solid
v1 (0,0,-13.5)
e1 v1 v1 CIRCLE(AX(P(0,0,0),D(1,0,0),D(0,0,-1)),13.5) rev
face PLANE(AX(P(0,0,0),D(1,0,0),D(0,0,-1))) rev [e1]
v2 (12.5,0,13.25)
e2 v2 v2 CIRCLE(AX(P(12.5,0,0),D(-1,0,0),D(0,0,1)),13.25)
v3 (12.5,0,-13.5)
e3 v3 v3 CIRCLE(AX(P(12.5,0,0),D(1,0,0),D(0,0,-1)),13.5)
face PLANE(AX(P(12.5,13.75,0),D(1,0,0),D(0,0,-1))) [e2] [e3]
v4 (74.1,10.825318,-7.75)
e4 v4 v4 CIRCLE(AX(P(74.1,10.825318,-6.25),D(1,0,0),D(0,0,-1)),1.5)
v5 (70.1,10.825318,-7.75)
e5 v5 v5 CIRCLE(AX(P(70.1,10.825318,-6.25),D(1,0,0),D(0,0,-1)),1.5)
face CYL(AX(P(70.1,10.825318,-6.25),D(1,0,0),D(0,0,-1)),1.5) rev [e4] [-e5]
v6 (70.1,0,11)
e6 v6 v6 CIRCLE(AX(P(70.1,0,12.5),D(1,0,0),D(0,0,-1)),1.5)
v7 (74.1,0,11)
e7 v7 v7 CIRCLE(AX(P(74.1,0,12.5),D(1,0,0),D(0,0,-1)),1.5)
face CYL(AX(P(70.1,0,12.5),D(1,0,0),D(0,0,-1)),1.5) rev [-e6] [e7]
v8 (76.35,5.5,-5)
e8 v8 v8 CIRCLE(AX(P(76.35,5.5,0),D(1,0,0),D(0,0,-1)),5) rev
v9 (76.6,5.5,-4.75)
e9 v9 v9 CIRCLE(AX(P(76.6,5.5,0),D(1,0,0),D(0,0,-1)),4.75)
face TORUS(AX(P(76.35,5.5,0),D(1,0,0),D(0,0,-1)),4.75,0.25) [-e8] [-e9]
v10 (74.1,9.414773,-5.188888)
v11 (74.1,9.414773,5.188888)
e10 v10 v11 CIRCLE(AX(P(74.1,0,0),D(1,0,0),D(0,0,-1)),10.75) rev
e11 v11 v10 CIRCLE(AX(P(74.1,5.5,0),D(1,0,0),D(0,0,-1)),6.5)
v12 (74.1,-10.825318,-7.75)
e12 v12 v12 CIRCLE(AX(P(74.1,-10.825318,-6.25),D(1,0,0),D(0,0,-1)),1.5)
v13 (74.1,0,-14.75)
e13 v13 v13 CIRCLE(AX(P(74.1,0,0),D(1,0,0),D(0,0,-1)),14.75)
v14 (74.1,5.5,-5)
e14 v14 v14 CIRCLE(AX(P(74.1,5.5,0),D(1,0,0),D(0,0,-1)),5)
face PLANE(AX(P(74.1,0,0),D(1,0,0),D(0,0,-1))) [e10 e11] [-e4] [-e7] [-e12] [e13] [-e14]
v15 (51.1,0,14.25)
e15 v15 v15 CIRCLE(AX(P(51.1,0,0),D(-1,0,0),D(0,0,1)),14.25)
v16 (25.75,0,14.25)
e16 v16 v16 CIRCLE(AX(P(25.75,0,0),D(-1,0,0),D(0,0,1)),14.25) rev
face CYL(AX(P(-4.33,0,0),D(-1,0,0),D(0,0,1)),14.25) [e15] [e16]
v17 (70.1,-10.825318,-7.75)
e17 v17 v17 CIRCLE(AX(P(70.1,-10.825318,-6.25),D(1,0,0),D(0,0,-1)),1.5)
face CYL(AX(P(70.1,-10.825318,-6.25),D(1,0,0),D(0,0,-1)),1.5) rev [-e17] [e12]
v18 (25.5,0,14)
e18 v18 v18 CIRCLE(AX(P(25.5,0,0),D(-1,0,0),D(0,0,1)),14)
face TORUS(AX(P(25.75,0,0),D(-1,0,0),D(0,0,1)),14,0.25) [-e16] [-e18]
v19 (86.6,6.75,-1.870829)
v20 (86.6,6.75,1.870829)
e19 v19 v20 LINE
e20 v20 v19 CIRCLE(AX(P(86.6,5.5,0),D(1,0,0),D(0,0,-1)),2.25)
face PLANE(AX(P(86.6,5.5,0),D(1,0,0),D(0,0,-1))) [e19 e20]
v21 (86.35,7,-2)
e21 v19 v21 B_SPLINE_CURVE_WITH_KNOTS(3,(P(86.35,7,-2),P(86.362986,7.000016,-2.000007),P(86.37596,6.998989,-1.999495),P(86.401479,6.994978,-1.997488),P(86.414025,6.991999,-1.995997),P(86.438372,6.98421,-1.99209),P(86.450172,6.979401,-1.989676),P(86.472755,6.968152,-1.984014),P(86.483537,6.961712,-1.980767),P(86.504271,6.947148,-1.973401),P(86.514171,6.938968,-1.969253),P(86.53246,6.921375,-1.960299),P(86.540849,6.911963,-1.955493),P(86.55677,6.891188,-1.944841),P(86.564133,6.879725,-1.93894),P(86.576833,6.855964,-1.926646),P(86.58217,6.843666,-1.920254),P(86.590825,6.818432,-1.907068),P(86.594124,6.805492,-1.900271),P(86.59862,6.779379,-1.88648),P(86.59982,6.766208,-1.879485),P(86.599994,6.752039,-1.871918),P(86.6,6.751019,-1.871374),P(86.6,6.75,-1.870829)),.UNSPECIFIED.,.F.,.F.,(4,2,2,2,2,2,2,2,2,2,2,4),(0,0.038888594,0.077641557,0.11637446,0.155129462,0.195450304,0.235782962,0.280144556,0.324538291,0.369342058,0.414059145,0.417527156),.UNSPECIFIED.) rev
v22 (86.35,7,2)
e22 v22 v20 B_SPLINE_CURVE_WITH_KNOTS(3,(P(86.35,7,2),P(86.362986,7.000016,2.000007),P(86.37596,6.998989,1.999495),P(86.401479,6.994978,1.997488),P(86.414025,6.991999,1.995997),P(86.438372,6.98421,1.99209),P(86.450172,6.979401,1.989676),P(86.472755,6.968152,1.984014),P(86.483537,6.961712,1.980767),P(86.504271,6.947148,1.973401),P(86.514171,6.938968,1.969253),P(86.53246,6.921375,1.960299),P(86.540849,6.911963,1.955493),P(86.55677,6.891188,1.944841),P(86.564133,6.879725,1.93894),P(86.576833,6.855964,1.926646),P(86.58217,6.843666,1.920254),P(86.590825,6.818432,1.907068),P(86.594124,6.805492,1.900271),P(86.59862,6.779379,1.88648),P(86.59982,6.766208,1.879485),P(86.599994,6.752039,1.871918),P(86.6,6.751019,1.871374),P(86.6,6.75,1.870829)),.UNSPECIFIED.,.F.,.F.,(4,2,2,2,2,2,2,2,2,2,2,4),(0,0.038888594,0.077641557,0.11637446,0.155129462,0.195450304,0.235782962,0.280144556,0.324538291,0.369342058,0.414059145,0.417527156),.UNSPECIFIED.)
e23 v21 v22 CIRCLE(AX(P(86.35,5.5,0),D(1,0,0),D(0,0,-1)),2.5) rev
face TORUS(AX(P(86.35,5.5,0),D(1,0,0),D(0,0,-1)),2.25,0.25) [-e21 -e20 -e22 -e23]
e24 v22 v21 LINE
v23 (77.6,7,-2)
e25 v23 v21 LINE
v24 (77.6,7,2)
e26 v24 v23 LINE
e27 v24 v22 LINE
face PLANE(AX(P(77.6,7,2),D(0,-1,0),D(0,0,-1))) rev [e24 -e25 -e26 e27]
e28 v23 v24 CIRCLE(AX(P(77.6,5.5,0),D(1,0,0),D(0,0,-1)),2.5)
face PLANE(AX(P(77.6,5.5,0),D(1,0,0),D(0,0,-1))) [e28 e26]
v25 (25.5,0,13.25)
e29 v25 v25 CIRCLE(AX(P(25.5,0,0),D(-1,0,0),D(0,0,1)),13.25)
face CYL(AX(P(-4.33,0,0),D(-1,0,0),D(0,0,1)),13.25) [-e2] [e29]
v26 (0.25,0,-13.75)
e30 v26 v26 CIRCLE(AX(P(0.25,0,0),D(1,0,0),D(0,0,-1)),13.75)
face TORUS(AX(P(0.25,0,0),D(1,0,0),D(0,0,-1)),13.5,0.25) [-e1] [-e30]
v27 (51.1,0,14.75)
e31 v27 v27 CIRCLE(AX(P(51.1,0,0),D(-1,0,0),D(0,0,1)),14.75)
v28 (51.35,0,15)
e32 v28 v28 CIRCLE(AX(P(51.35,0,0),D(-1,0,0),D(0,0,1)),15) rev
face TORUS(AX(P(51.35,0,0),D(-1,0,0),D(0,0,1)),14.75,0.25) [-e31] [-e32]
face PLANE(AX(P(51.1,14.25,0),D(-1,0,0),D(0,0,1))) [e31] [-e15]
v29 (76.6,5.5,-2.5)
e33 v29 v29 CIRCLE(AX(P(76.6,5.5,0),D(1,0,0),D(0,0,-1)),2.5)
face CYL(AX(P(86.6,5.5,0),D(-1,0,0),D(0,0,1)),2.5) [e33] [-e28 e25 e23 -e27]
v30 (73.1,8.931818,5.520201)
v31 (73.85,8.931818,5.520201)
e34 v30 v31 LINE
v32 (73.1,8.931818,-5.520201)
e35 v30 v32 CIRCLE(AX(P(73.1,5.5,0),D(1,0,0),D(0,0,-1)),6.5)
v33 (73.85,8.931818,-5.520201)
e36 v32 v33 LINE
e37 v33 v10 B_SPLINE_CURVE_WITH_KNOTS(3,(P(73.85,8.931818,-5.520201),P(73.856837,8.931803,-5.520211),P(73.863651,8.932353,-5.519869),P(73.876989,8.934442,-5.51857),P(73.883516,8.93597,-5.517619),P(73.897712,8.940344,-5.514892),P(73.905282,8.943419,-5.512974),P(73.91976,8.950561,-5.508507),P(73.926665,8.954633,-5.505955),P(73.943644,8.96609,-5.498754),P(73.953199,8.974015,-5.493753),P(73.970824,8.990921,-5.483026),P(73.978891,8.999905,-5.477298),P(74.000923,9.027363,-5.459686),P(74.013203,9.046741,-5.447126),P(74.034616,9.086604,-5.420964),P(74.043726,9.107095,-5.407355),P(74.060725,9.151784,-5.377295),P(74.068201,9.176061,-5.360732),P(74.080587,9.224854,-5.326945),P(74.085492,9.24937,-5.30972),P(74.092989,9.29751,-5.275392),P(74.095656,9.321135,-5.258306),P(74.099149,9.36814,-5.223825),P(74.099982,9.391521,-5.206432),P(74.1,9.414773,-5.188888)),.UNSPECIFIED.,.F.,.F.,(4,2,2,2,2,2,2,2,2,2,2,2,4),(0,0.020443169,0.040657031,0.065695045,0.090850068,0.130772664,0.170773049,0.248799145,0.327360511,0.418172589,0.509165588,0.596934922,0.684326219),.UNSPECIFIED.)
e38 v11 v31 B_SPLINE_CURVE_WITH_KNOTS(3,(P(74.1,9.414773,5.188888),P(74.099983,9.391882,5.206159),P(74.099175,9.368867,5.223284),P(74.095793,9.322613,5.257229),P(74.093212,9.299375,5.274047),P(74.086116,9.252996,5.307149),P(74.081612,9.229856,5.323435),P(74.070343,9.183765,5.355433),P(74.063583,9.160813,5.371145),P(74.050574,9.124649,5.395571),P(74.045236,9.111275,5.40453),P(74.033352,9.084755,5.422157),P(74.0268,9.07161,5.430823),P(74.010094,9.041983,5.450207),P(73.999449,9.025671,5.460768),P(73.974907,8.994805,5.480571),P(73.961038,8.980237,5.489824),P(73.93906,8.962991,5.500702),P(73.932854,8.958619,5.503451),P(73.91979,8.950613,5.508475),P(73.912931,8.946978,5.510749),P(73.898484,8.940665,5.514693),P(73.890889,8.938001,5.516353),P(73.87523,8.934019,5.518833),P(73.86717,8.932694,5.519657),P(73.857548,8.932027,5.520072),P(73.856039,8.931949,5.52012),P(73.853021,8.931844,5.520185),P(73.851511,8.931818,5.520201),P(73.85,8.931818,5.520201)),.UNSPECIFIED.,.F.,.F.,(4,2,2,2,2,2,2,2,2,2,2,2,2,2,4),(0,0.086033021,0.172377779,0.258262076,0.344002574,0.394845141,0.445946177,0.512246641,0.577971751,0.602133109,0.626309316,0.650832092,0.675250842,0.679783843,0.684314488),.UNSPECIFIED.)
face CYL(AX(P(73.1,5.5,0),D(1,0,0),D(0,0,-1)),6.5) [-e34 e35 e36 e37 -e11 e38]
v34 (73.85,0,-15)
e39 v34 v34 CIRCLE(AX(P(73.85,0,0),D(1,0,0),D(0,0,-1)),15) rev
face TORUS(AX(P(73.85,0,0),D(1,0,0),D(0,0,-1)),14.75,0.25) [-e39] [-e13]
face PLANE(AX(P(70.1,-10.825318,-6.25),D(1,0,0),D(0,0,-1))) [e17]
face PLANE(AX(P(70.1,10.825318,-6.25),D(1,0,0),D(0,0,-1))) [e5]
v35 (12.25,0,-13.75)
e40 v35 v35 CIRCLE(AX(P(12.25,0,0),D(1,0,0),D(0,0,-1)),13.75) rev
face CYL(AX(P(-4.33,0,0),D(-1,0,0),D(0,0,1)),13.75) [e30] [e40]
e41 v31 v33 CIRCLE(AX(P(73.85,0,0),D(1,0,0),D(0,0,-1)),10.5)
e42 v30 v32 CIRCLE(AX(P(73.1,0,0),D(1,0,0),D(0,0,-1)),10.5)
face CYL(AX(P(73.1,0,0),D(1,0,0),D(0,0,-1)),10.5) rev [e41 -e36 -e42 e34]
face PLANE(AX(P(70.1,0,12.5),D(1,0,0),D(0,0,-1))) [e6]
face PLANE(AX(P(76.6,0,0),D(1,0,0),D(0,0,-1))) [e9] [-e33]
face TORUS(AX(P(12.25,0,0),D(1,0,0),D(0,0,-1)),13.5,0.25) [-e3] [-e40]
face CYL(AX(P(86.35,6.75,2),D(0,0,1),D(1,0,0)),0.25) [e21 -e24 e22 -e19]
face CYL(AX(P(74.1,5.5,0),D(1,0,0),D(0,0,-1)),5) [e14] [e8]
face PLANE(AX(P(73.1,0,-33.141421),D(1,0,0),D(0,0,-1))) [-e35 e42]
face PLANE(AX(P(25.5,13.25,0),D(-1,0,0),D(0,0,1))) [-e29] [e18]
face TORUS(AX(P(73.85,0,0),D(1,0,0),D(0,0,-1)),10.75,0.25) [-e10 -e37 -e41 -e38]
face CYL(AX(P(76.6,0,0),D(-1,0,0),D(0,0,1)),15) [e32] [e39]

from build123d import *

# Parameters (mm, degrees)
SKETCH1_R           = 15
BOSS_EXTRUDE1_DEPTH = 76.6
SKETCH2_R           = 2.5
BOSS_EXTRUDE2_DEPTH = 10
CUT_EXTRUDE1_START  = -9
CUT_EXTRUDE1_DEPTH  = 9
CUT_EXTRUDE2_START  = -2.5
SKETCH6_R           = 15
SKETCH6_R_2         = 5
CUT_EXTRUDE2_DEPTH  = 2.5
CUT_EXTRUDE3_DEPTH  = 1
SKETCH8_R           = 1.5
CUT_EXTRUDE4_DEPTH  = 4
FILLET1_R           = 0.25


with BuildPart() as part:
    # Sketch1 → Boss-Extrude1 (new body)
    with BuildSketch(Plane(origin=(0, 0, 0), x_dir=(0, 0, -1), z_dir=(1, 0, 0))):
        Circle(SKETCH1_R)
    extrude(amount=BOSS_EXTRUDE1_DEPTH)

    # Sketch2 → Boss-Extrude2 (add)
    with BuildSketch(Plane(origin=(76.6, 0, 0), x_dir=(0, 0, -1), z_dir=(1, 0, 0))):
        with Locations((0, 5.5)):
            Circle(SKETCH2_R)
    extrude(amount=BOSS_EXTRUDE2_DEPTH)

    # Sketch4 → Cut-Extrude1 (cut)
    with BuildSketch(Plane(origin=(86.6, 0, 0), x_dir=(0, 0, -1), z_dir=(1, 0, 0)).offset(CUT_EXTRUDE1_START)):
        with BuildLine():
            Line((-2, 7), (2, 7))
            ThreePointArc((2, 7), (0, 8), (-2, 7))
        make_face()
    extrude(amount=CUT_EXTRUDE1_DEPTH, mode=Mode.SUBTRACT)

    # Sketch5 → Cut-Revolve1 (revolve, cut)
    with BuildSketch(Plane.XY, mode=Mode.PRIVATE) as cut_revolve1_sk:
        Polygon((0, 13.75), (12.5, 13.75), (12.5, 13.25), (25.5, 13.25), (25.5, 14.25), (51.1, 14.25), (51.1, 15), (0, 15), align=None)
    revolve(cut_revolve1_sk.sketch.rotate(Axis((-4.33, 0, 0), (1, 0, 0)), 90), axis=Axis((-4.33, 0, 0), (1, 0, 0)), mode=Mode.SUBTRACT)

    # Sketch6 → Cut-Extrude2 (cut)
    with BuildSketch(Plane(origin=(76.6, 0, 0), x_dir=(0, 0, -1), z_dir=(1, 0, 0)).offset(CUT_EXTRUDE2_START)):
        with Locations(Location((0, 0, 0), (0, 0, 180))):
            Circle(SKETCH6_R)
        with Locations((0, 5.5)):
            Circle(SKETCH6_R_2, mode=Mode.SUBTRACT)
    extrude(amount=CUT_EXTRUDE2_DEPTH, mode=Mode.SUBTRACT)

    # Sketch7 → Cut-Extrude3 (cut)
    with BuildSketch(Plane(origin=(74.1, 0, 0), x_dir=(0, 0, -1), z_dir=(1, 0, 0))):
        with BuildLine():
            ThreePointArc((-5.520201443, 8.931818182), (-5.113114748, -9.17093548), (10.5, 0))
            ThreePointArc((10.5, 0), (9.17093548, 5.113114748), (5.520201443, 8.931818182))
            ThreePointArc((5.520201443, 8.931818182), (6.25025237, 7.284473399), (6.5, 5.5))
            ThreePointArc((6.5, 5.5), (-1.784473399, -0.75025237), (-5.520201443, 8.931818182))
        make_face()
    extrude(amount=-CUT_EXTRUDE3_DEPTH, mode=Mode.SUBTRACT)

    # Sketch8 → Cut-Extrude4 (cut)
    with BuildSketch(Plane(origin=(74.1, 0, 0), x_dir=(0, 0, -1), z_dir=(1, 0, 0))):
        with Locations((6.25, 10.825317547)):
            Circle(SKETCH8_R)
        with Locations((6.25, -10.825317547)):
            Circle(SKETCH8_R)
        with Locations((-12.5, 0)):
            Circle(SKETCH8_R)
    extrude(amount=-CUT_EXTRUDE4_DEPTH, mode=Mode.SUBTRACT)

    # Fillet1
    # the kernel refuses this fillet: 0.25 mm, written as the material it takes off along each edge
    with BuildSketch(Plane(origin=(86.6, 7, 2.625), x_dir=(0, -1, 0), z_dir=(0, 0, -1))) as fillet1_piece_1:
        with BuildLine():
            CenterArc((FILLET1_R, FILLET1_R), FILLET1_R, 180, 90)
            Line((0, FILLET1_R), (0, 0))
            Line((0, 0), (FILLET1_R, 0))
        make_face()
    extrude(amount=5.25, mode=Mode.SUBTRACT)
    with BuildSketch(Plane(origin=(0, 0, 0), x_dir=(0, 0, 1), z_dir=(0, 1, 0))) as fillet1_piece_2:
        with BuildLine():
            CenterArc((13.75 - FILLET1_R, FILLET1_R), FILLET1_R, 270, 90)
            Line((13.75 - FILLET1_R, 0), (13.75, 0))
            Line((13.75, 0), (13.75, FILLET1_R))
        make_face()
    revolve(axis=Axis((0, 0, 0), (1, 0, 0)), mode=Mode.SUBTRACT)
    with BuildSketch(Plane(origin=(12.5, 0, 0), x_dir=(0, 0, 1), z_dir=(0, 1, 0))) as fillet1_piece_3:
        with BuildLine():
            CenterArc((13.75 - FILLET1_R, -FILLET1_R), FILLET1_R, 0, 90)
            Line((13.75, -FILLET1_R), (13.75, 0))
            Line((13.75, 0), (13.75 - FILLET1_R, 0))
        make_face()
    revolve(axis=Axis((12.5, 0, 0), (1, 0, 0)), mode=Mode.SUBTRACT)
    with BuildSketch(Plane(origin=(25.5, 0, 0), x_dir=(0, 0, 1), z_dir=(0, 1, 0))) as fillet1_piece_4:
        with BuildLine():
            CenterArc((14.25 - FILLET1_R, FILLET1_R), FILLET1_R, 270, 90)
            Line((14.25 - FILLET1_R, 0), (14.25, 0))
            Line((14.25, 0), (14.25, FILLET1_R))
        make_face()
    revolve(axis=Axis((25.5, 0, 0), (1, 0, 0)), mode=Mode.SUBTRACT)
    with BuildSketch(Plane(origin=(51.1, 0, 0), x_dir=(0, 0, -1), z_dir=(0, -1, 0))) as fillet1_piece_5:
        with BuildLine():
            CenterArc((15 - FILLET1_R, FILLET1_R), FILLET1_R, 270, 90)
            Line((15 - FILLET1_R, 0), (15, 0))
            Line((15, 0), (15, FILLET1_R))
        make_face()
    revolve(axis=Axis((51.1, 0, 0), (1, 0, 0)), mode=Mode.SUBTRACT)
    with BuildSketch(Plane(origin=(74.1, 0, 0), x_dir=(0, 0, -1), z_dir=(0, 1, 0))) as fillet1_piece_6:
        with BuildLine():
            CenterArc((15 - FILLET1_R, FILLET1_R), FILLET1_R, 270, 90)
            Line((15 - FILLET1_R, 0), (15, 0))
            Line((15, 0), (15, FILLET1_R))
        make_face()
    revolve(axis=Axis((74.1, 0, 0), (-1, 0, 0)), mode=Mode.SUBTRACT)
    with BuildSketch(Plane(origin=(76.6, 5.5, 0), x_dir=(0, 0, -1), z_dir=(0, -1, 0))) as fillet1_piece_7:
        with BuildLine():
            CenterArc((5 - FILLET1_R, -FILLET1_R), FILLET1_R, 0, 90)
            Line((5 - FILLET1_R, 0), (5, 0))
            Line((5, 0), (5, -FILLET1_R))
        make_face()
    revolve(axis=Axis((76.6, 5.5, 0), (1, 0, 0)), mode=Mode.SUBTRACT)
    with BuildSketch(Plane(origin=(74.1, 0, 0), x_dir=(0, 0.8804976199677298, 0.47405056822153846), z_dir=(0, 0.47405056822153846, -0.8804976199677298))) as fillet1_piece_8_section:
        with BuildLine():
            CenterArc((10.5 + FILLET1_R, -FILLET1_R), FILLET1_R, 90, 90)
            Line((10.5, -FILLET1_R), (10.5, 0))
            Line((10.5, 0), (10.5 + FILLET1_R, 0))
        make_face()
    fillet1_piece_8 = revolve(axis=Axis((74.1, 0, 0), (1, 0, 0)), revolution_arc=241.702449394, mode=Mode.PRIVATE)
    fillet1_piece_8 = fillet1_piece_8 - Plane(origin=(74.032708533, 5.5, 0), x_dir=(0, 0.5279720279720663, -0.8492617604007988), z_dir=(1, 0, 0)) * Cylinder(6.5, 44, mode=Mode.PRIVATE)
    add(fillet1_piece_8, mode=Mode.SUBTRACT)
    with BuildSketch(Plane(origin=(86.6, 5.5, 0), x_dir=(0, 0.7796364213611253, 0.6262324252920938), z_dir=(0, 0.6262324252920938, -0.7796364213611253))) as fillet1_piece_9:
        with BuildLine():
            CenterArc((2.5 - FILLET1_R, -FILLET1_R), FILLET1_R, 0, 90)
            Line((2.5 - FILLET1_R, 0), (2.5, 0))
            Line((2.5, 0), (2.5, -FILLET1_R))
        make_face()
    revolve(axis=Axis((86.6, 5.5, 0), (1, 0, 0)), revolution_arc=231.227298529, mode=Mode.SUBTRACT)
    with BuildSketch(Plane(origin=(86.6, 5.5, 0), x_dir=(0, 0, -1), z_dir=(0, -1, 0))) as fillet1_piece_10:
        with BuildLine():
            CenterArc((2.5 - FILLET1_R, -FILLET1_R), FILLET1_R, 0, 90)
            Line((2.5 - FILLET1_R, 0), (2.5, 0))
            Line((2.5, 0), (2.5, -FILLET1_R))
        make_face()
    revolve(axis=Axis((86.6, 5.5, 0), (1, 0, 0)), revolution_arc=51.194807976, mode=Mode.SUBTRACT)
    with BuildSketch(Plane(origin=(74.1, 0, 0), x_dir=(0, 0, -1), z_dir=(0, -1, 0))) as fillet1_piece_11_section:
        with BuildLine():
            CenterArc((10.5 + FILLET1_R, -FILLET1_R), FILLET1_R, 90, 90)
            Line((10.5, -FILLET1_R), (10.5, 0))
            Line((10.5, 0), (10.5 + FILLET1_R, 0))
        make_face()
    fillet1_piece_11 = revolve(axis=Axis((74.1, 0, 0), (1, 0, 0)), revolution_arc=61.693404227, mode=Mode.PRIVATE)
    fillet1_piece_11 = fillet1_piece_11 - Plane(origin=(74.03049628, 5.5, 0), x_dir=(0, 0.5279720279720663, -0.8492617604007988), z_dir=(1, 0, 0)) * Cylinder(6.5, 44, mode=Mode.PRIVATE)
    add(fillet1_piece_11, mode=Mode.SUBTRACT)


solid = part.part
